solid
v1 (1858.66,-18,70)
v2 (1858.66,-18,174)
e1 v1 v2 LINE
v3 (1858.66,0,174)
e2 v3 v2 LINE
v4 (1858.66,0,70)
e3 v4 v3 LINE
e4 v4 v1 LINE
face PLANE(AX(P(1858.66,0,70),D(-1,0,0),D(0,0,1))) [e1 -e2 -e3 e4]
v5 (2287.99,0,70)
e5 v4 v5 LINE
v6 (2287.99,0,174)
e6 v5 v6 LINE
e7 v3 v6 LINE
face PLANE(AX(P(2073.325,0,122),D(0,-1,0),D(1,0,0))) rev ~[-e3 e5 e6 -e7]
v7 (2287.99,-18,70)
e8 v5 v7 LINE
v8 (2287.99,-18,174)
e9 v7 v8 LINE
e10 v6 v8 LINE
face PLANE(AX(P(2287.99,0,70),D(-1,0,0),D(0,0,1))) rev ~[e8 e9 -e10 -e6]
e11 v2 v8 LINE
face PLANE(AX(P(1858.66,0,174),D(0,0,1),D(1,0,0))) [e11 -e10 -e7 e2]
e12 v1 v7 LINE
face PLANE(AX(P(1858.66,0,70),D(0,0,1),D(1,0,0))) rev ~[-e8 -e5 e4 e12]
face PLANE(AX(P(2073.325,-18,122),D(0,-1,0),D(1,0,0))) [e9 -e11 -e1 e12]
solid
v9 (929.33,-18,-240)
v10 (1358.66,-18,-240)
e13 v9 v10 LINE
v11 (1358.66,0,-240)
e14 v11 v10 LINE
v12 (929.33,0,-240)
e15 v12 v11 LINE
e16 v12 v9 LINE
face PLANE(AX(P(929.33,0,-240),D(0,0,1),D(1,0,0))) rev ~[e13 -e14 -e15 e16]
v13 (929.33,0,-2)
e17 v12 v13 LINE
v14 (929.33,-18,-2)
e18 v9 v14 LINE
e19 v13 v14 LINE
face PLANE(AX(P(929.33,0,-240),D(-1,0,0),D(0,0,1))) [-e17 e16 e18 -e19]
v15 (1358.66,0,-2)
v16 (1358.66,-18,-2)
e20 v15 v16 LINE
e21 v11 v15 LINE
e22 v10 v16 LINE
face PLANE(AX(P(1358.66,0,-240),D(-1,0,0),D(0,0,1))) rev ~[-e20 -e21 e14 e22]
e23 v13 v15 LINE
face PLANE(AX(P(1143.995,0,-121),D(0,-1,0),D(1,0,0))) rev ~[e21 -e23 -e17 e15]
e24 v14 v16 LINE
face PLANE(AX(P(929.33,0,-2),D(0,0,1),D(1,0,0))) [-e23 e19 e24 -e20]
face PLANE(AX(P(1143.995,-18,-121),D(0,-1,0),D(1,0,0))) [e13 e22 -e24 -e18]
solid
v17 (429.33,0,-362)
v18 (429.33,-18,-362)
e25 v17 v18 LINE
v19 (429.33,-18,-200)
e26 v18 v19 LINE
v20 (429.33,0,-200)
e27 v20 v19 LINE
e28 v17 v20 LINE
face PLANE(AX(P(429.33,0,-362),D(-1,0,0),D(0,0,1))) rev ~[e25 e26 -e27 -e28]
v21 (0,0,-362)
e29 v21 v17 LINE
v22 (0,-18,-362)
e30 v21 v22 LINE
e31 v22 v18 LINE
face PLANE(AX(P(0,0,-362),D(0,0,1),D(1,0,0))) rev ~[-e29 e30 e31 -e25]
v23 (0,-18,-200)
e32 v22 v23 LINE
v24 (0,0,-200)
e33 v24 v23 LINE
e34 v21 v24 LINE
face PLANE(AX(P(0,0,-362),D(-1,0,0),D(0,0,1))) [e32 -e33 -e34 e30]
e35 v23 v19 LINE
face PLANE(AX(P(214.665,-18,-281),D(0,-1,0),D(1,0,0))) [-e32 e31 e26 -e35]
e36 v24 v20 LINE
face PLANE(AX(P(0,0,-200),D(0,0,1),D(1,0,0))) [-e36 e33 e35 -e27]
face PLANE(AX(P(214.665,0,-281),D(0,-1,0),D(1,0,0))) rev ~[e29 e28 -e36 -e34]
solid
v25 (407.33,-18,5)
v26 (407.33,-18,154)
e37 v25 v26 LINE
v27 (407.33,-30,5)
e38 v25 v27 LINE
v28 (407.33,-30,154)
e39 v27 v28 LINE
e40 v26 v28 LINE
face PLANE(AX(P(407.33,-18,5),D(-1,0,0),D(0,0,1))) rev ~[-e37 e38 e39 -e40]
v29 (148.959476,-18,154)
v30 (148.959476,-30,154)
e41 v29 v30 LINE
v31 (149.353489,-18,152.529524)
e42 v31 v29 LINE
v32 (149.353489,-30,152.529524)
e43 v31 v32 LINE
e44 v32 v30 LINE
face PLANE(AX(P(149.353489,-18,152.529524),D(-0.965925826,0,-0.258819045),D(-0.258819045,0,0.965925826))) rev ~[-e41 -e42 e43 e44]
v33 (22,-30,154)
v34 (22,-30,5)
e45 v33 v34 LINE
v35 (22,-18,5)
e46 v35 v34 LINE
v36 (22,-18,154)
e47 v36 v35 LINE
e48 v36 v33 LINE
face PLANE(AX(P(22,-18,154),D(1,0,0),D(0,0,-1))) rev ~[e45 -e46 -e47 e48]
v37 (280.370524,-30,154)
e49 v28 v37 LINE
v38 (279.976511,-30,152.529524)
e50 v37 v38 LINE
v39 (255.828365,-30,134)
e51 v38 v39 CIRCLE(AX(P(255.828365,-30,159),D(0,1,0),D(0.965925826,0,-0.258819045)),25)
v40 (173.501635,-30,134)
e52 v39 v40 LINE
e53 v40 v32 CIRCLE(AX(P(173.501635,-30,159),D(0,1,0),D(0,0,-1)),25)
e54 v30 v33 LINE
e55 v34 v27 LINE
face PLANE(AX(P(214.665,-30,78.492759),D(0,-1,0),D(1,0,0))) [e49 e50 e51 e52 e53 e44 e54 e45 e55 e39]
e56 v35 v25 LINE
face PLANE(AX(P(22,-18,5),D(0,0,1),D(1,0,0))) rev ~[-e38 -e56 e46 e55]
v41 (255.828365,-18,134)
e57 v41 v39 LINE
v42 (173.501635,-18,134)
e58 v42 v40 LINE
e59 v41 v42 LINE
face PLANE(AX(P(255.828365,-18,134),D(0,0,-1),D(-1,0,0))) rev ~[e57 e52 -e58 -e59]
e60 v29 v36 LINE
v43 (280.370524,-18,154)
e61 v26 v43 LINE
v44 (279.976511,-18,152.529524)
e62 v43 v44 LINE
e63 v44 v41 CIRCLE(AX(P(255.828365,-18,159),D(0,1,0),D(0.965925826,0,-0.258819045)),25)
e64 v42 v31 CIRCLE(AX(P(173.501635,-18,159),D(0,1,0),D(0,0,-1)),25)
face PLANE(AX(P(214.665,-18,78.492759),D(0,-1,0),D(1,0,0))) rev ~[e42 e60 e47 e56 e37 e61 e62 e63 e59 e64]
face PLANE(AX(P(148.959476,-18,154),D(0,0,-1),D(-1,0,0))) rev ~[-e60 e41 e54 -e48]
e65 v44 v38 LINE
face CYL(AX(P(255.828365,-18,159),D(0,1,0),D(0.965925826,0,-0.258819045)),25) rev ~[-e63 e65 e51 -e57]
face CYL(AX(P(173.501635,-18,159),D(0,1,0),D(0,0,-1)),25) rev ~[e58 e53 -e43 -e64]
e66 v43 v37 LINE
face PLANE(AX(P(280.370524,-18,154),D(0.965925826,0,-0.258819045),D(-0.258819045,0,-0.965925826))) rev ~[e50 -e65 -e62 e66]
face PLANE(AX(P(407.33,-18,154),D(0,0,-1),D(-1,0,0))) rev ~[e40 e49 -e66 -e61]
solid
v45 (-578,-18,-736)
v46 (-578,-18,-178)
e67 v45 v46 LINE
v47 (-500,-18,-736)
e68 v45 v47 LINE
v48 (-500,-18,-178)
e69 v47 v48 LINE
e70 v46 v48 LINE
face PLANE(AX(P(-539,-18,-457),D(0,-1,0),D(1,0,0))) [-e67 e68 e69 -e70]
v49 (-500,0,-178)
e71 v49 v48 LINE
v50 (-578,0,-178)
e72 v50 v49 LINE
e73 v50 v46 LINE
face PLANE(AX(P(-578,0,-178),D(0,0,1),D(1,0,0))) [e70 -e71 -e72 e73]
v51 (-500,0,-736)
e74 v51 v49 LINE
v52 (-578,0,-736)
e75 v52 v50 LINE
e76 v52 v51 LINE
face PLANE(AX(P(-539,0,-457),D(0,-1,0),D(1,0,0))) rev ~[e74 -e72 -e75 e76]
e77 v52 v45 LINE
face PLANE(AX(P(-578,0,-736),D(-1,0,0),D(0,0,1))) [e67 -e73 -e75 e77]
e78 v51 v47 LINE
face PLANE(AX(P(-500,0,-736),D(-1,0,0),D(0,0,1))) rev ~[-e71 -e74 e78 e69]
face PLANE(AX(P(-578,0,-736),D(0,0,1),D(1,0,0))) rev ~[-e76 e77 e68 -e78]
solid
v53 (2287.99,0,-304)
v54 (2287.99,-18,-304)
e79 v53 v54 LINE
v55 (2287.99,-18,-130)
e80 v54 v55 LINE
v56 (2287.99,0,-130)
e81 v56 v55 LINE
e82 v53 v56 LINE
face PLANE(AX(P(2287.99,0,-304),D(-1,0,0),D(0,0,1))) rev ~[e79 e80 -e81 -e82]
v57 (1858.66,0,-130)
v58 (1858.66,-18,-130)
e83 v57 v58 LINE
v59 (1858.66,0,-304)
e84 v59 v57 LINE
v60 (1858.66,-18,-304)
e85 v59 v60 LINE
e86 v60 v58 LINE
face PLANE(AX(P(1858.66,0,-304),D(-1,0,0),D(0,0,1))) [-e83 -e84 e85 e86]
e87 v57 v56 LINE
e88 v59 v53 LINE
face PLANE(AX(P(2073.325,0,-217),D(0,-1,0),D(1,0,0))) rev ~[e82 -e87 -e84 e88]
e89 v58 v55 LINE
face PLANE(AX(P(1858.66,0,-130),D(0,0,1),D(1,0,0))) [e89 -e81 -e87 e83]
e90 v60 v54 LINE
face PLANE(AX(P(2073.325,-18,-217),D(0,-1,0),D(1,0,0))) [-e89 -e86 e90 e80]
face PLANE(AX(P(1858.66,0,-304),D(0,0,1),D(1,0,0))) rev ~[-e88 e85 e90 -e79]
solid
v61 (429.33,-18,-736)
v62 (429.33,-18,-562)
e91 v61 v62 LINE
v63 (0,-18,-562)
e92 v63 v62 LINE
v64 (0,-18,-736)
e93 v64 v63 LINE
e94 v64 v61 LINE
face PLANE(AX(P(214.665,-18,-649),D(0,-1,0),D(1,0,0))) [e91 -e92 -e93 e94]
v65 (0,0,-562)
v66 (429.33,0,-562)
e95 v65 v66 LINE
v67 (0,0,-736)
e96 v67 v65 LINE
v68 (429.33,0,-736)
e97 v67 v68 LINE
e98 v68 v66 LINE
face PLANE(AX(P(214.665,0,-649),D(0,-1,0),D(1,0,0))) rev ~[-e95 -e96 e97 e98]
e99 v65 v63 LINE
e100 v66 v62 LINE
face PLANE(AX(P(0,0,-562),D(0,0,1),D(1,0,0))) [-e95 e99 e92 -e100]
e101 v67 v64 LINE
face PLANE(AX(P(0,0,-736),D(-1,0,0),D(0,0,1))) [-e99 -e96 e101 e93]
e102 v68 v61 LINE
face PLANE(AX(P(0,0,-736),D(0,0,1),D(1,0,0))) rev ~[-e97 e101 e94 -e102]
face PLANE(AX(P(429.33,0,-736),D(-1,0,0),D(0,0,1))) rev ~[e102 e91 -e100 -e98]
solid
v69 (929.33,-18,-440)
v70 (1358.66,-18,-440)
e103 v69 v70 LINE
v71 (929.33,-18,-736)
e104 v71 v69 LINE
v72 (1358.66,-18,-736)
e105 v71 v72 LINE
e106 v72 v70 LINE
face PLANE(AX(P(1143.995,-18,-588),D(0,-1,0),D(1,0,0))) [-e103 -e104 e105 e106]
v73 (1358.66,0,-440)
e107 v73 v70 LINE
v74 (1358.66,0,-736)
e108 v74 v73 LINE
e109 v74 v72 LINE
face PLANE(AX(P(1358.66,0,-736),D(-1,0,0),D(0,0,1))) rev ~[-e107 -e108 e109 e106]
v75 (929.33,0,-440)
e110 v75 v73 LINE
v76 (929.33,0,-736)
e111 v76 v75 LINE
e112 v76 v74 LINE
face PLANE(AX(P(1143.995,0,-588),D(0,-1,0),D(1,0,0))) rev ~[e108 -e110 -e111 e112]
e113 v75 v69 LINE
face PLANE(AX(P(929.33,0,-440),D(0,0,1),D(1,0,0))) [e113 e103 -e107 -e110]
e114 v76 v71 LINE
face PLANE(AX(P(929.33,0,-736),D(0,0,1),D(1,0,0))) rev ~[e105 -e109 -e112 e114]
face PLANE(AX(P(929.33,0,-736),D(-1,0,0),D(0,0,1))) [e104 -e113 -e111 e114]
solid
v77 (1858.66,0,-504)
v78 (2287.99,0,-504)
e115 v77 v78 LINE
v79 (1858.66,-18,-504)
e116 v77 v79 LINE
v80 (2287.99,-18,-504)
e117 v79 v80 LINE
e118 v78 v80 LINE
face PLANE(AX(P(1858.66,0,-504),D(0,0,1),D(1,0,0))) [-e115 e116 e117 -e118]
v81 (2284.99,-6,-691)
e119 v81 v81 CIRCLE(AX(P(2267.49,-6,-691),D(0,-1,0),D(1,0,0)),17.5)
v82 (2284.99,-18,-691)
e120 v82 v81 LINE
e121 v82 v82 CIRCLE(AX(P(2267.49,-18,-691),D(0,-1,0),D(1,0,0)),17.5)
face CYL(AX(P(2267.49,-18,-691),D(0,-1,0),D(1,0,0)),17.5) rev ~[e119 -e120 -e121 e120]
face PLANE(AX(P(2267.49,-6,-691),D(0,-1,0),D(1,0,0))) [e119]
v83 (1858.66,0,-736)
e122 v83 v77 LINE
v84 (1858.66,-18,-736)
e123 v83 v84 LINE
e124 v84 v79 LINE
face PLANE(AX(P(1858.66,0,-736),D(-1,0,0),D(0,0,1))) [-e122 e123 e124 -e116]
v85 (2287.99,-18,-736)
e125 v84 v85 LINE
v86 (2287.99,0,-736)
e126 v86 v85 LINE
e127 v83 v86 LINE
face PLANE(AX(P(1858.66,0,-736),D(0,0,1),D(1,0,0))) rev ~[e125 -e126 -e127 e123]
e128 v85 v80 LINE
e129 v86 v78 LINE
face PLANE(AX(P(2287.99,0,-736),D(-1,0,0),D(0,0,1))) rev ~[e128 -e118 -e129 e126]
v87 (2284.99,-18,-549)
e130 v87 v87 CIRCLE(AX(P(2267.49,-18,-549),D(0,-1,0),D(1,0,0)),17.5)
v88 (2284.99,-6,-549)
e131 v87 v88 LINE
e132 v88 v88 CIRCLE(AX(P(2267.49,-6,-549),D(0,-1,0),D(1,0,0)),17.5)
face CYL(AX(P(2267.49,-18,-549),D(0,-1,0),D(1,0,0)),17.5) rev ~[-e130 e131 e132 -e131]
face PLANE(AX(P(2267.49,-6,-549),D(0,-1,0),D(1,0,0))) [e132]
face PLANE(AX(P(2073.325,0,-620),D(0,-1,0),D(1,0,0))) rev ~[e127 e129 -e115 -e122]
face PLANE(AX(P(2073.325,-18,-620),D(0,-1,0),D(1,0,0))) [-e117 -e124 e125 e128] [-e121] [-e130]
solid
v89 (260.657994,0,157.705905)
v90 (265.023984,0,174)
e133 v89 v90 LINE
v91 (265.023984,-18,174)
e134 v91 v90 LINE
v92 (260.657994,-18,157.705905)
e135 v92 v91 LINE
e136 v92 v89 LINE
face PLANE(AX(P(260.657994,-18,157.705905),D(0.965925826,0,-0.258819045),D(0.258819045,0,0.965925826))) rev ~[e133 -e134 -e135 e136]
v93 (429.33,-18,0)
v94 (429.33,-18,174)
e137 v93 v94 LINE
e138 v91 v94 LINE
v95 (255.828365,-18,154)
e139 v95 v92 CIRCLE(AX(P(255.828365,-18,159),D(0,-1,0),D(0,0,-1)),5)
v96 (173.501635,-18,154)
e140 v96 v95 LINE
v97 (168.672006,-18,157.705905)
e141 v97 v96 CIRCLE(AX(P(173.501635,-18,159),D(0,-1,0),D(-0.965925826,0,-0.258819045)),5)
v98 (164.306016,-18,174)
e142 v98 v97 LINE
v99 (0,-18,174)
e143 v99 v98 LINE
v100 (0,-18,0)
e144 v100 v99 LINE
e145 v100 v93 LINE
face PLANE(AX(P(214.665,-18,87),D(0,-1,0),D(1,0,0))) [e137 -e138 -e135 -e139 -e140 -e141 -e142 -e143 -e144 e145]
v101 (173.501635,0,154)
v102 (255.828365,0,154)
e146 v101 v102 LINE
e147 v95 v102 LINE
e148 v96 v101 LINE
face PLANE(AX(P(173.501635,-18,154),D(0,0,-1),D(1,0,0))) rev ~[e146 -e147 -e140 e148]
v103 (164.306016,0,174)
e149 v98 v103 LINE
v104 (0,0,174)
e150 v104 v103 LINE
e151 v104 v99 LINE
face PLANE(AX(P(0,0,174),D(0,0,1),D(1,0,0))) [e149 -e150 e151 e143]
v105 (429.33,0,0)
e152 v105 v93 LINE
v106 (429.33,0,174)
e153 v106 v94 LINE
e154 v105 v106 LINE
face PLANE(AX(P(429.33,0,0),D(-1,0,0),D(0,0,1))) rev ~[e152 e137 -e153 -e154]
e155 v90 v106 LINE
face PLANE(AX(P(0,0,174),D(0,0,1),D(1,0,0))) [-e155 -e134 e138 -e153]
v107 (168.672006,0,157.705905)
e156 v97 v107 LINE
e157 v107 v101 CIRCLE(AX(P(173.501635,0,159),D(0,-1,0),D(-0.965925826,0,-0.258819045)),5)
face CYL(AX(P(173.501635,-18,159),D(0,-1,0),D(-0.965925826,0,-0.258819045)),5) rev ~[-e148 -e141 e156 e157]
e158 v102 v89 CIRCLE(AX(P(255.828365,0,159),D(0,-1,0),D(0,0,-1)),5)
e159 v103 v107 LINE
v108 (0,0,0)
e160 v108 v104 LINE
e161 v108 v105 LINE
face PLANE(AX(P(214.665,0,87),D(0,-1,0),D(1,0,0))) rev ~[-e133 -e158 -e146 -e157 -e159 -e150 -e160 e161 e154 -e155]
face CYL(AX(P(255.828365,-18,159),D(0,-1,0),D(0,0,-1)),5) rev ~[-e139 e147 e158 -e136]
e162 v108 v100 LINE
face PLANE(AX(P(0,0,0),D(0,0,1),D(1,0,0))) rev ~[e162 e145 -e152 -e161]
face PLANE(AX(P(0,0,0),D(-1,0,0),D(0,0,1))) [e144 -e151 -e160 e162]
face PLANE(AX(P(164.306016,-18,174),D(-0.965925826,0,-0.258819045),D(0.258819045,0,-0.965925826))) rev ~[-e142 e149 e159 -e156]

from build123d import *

# Parameters (mm, degrees)
F1_W     = 78
F1_H     = 558
F2_DEPTH = 18
F1_W_2   = 429.33
F1_H_2   = 174
F1_H_3   = 162
F1_H_4   = 238
F1_H_5   = 296
F1_H_6   = 104
F1_H_7   = 232
F3_R     = 17.5
F4_DEPTH = 12
F6_DEPTH = 18
F8_DEPTH = 12


# Not quite as in the source:
# - a feature names something its author has since deleted; it is built from what else it names


with BuildPart() as f2:
    # F1 (on Front) → F2 (new body)
    with BuildSketch(Plane.XZ):
        with Locations((-539, -457)):
            Rectangle(F1_W, F1_H)
    extrude(amount=F2_DEPTH)


with BuildPart() as f2b:
    # F1 (on Front) → F2, piece 2 (new body)
    with BuildSketch(Plane.XZ):
        with Locations((214.665, 87)):
            Rectangle(F1_W_2, F1_H_2)
    extrude(amount=F2_DEPTH)

    # F5 (on face) → F6 (cut)
    with BuildSketch(Plane.XZ.offset(18)):
        with BuildLine():
            ThreePointArc((168.6720058084, 157.7059047745), (170.4578277949, 155.0332332985), (173.5016349399, 154))
            Line((173.5016349399, 154), (214.665, 154))
            Line((214.665, 154), (255.8283650601, 154))
            ThreePointArc((255.8283650601, 154), (258.8721722051, 155.0332332985), (260.6579941916, 157.7059047745))
            Line((260.6579941916, 157.7059047745), (265.0239838486, 174))
            Line((265.0239838486, 174), (164.3060161514, 174))
            Line((164.3060161514, 174), (168.6720058084, 157.7059047745))
        make_face()
    extrude(amount=-F6_DEPTH, mode=Mode.SUBTRACT)


with BuildPart() as f2c:
    # F1 (on Front) → F2, piece 3 (new body)
    with BuildSketch(Plane.XZ):
        with Locations((214.665, -281)):
            Rectangle(F1_W_2, F1_H_3)
    extrude(amount=F2_DEPTH)


with BuildPart() as f2d:
    # F1 (on Front) → F2, piece 4 (new body)
    with BuildSketch(Plane.XZ):
        with Locations((214.665, -649)):
            Rectangle(F1_W_2, F1_H_2)
    extrude(amount=F2_DEPTH)


with BuildPart() as f2e:
    # F1 (on Front) → F2, piece 5 (new body)
    with BuildSketch(Plane.XZ):
        with Locations((1143.995, -121)):
            Rectangle(F1_W_2, F1_H_4)
    extrude(amount=F2_DEPTH)


with BuildPart() as f2f:
    # F1 (on Front) → F2, piece 6 (new body)
    with BuildSketch(Plane.XZ):
        with Locations((1143.995, -588)):
            Rectangle(F1_W_2, F1_H_5)
    extrude(amount=F2_DEPTH)


with BuildPart() as f2g:
    # F1 (on Front) → F2, piece 7 (new body)
    with BuildSketch(Plane.XZ):
        with Locations((2073.325, 122)):
            Rectangle(F1_W_2, F1_H_6)
    extrude(amount=F2_DEPTH)


with BuildPart() as f2h:
    # F1 (on Front) → F2, piece 8 (new body)
    with BuildSketch(Plane.XZ):
        with Locations((2073.325, -217)):
            Rectangle(F1_W_2, F1_H_2)
    extrude(amount=F2_DEPTH)


with BuildPart() as f2i:
    # F1 (on Front) → F2, piece 9 (new body)
    with BuildSketch(Plane.XZ):
        with Locations((2073.325, -620)):
            Rectangle(F1_W_2, F1_H_7)
    extrude(amount=F2_DEPTH)

    # F3 (on face) → F4 (cut)
    with BuildSketch(Plane.XZ.offset(18)):
        with Locations((2267.49, -549)):
            Circle(F3_R)
        with Locations((2267.49, -691)):
            Circle(F3_R)
    extrude(amount=-F4_DEPTH, mode=Mode.SUBTRACT)


with BuildPart() as f8:
    # F7 (on face) → F8 (new body)
    with BuildSketch(Plane.XZ.offset(18)):
        with BuildLine():
            Line((22, 154), (22, 5))
            Line((22, 5), (407.33, 5))
            Line((407.33, 5), (407.33, 154))
            Line((407.33, 154), (280.3705236082, 154))
            Line((280.3705236082, 154), (279.9765107173, 152.5295238724))
            ThreePointArc((279.9765107173, 152.5295238724), (271.0474007853, 139.1661664927), (255.8283650601, 134))
            Line((255.8283650601, 134), (173.5016349399, 134))
            ThreePointArc((173.5016349399, 134), (158.2825992147, 139.1661664927), (149.3534892827, 152.5295238724))
            Line((149.3534892827, 152.5295238724), (148.9594763918, 154))
            Line((148.9594763918, 154), (22, 154))
        make_face()
    extrude(amount=F8_DEPTH)


solid = Compound([f2.part, f2b.part, f2c.part, f2d.part, f2e.part, f2f.part, f2g.part, f2h.part, f2i.part, f8.part])
